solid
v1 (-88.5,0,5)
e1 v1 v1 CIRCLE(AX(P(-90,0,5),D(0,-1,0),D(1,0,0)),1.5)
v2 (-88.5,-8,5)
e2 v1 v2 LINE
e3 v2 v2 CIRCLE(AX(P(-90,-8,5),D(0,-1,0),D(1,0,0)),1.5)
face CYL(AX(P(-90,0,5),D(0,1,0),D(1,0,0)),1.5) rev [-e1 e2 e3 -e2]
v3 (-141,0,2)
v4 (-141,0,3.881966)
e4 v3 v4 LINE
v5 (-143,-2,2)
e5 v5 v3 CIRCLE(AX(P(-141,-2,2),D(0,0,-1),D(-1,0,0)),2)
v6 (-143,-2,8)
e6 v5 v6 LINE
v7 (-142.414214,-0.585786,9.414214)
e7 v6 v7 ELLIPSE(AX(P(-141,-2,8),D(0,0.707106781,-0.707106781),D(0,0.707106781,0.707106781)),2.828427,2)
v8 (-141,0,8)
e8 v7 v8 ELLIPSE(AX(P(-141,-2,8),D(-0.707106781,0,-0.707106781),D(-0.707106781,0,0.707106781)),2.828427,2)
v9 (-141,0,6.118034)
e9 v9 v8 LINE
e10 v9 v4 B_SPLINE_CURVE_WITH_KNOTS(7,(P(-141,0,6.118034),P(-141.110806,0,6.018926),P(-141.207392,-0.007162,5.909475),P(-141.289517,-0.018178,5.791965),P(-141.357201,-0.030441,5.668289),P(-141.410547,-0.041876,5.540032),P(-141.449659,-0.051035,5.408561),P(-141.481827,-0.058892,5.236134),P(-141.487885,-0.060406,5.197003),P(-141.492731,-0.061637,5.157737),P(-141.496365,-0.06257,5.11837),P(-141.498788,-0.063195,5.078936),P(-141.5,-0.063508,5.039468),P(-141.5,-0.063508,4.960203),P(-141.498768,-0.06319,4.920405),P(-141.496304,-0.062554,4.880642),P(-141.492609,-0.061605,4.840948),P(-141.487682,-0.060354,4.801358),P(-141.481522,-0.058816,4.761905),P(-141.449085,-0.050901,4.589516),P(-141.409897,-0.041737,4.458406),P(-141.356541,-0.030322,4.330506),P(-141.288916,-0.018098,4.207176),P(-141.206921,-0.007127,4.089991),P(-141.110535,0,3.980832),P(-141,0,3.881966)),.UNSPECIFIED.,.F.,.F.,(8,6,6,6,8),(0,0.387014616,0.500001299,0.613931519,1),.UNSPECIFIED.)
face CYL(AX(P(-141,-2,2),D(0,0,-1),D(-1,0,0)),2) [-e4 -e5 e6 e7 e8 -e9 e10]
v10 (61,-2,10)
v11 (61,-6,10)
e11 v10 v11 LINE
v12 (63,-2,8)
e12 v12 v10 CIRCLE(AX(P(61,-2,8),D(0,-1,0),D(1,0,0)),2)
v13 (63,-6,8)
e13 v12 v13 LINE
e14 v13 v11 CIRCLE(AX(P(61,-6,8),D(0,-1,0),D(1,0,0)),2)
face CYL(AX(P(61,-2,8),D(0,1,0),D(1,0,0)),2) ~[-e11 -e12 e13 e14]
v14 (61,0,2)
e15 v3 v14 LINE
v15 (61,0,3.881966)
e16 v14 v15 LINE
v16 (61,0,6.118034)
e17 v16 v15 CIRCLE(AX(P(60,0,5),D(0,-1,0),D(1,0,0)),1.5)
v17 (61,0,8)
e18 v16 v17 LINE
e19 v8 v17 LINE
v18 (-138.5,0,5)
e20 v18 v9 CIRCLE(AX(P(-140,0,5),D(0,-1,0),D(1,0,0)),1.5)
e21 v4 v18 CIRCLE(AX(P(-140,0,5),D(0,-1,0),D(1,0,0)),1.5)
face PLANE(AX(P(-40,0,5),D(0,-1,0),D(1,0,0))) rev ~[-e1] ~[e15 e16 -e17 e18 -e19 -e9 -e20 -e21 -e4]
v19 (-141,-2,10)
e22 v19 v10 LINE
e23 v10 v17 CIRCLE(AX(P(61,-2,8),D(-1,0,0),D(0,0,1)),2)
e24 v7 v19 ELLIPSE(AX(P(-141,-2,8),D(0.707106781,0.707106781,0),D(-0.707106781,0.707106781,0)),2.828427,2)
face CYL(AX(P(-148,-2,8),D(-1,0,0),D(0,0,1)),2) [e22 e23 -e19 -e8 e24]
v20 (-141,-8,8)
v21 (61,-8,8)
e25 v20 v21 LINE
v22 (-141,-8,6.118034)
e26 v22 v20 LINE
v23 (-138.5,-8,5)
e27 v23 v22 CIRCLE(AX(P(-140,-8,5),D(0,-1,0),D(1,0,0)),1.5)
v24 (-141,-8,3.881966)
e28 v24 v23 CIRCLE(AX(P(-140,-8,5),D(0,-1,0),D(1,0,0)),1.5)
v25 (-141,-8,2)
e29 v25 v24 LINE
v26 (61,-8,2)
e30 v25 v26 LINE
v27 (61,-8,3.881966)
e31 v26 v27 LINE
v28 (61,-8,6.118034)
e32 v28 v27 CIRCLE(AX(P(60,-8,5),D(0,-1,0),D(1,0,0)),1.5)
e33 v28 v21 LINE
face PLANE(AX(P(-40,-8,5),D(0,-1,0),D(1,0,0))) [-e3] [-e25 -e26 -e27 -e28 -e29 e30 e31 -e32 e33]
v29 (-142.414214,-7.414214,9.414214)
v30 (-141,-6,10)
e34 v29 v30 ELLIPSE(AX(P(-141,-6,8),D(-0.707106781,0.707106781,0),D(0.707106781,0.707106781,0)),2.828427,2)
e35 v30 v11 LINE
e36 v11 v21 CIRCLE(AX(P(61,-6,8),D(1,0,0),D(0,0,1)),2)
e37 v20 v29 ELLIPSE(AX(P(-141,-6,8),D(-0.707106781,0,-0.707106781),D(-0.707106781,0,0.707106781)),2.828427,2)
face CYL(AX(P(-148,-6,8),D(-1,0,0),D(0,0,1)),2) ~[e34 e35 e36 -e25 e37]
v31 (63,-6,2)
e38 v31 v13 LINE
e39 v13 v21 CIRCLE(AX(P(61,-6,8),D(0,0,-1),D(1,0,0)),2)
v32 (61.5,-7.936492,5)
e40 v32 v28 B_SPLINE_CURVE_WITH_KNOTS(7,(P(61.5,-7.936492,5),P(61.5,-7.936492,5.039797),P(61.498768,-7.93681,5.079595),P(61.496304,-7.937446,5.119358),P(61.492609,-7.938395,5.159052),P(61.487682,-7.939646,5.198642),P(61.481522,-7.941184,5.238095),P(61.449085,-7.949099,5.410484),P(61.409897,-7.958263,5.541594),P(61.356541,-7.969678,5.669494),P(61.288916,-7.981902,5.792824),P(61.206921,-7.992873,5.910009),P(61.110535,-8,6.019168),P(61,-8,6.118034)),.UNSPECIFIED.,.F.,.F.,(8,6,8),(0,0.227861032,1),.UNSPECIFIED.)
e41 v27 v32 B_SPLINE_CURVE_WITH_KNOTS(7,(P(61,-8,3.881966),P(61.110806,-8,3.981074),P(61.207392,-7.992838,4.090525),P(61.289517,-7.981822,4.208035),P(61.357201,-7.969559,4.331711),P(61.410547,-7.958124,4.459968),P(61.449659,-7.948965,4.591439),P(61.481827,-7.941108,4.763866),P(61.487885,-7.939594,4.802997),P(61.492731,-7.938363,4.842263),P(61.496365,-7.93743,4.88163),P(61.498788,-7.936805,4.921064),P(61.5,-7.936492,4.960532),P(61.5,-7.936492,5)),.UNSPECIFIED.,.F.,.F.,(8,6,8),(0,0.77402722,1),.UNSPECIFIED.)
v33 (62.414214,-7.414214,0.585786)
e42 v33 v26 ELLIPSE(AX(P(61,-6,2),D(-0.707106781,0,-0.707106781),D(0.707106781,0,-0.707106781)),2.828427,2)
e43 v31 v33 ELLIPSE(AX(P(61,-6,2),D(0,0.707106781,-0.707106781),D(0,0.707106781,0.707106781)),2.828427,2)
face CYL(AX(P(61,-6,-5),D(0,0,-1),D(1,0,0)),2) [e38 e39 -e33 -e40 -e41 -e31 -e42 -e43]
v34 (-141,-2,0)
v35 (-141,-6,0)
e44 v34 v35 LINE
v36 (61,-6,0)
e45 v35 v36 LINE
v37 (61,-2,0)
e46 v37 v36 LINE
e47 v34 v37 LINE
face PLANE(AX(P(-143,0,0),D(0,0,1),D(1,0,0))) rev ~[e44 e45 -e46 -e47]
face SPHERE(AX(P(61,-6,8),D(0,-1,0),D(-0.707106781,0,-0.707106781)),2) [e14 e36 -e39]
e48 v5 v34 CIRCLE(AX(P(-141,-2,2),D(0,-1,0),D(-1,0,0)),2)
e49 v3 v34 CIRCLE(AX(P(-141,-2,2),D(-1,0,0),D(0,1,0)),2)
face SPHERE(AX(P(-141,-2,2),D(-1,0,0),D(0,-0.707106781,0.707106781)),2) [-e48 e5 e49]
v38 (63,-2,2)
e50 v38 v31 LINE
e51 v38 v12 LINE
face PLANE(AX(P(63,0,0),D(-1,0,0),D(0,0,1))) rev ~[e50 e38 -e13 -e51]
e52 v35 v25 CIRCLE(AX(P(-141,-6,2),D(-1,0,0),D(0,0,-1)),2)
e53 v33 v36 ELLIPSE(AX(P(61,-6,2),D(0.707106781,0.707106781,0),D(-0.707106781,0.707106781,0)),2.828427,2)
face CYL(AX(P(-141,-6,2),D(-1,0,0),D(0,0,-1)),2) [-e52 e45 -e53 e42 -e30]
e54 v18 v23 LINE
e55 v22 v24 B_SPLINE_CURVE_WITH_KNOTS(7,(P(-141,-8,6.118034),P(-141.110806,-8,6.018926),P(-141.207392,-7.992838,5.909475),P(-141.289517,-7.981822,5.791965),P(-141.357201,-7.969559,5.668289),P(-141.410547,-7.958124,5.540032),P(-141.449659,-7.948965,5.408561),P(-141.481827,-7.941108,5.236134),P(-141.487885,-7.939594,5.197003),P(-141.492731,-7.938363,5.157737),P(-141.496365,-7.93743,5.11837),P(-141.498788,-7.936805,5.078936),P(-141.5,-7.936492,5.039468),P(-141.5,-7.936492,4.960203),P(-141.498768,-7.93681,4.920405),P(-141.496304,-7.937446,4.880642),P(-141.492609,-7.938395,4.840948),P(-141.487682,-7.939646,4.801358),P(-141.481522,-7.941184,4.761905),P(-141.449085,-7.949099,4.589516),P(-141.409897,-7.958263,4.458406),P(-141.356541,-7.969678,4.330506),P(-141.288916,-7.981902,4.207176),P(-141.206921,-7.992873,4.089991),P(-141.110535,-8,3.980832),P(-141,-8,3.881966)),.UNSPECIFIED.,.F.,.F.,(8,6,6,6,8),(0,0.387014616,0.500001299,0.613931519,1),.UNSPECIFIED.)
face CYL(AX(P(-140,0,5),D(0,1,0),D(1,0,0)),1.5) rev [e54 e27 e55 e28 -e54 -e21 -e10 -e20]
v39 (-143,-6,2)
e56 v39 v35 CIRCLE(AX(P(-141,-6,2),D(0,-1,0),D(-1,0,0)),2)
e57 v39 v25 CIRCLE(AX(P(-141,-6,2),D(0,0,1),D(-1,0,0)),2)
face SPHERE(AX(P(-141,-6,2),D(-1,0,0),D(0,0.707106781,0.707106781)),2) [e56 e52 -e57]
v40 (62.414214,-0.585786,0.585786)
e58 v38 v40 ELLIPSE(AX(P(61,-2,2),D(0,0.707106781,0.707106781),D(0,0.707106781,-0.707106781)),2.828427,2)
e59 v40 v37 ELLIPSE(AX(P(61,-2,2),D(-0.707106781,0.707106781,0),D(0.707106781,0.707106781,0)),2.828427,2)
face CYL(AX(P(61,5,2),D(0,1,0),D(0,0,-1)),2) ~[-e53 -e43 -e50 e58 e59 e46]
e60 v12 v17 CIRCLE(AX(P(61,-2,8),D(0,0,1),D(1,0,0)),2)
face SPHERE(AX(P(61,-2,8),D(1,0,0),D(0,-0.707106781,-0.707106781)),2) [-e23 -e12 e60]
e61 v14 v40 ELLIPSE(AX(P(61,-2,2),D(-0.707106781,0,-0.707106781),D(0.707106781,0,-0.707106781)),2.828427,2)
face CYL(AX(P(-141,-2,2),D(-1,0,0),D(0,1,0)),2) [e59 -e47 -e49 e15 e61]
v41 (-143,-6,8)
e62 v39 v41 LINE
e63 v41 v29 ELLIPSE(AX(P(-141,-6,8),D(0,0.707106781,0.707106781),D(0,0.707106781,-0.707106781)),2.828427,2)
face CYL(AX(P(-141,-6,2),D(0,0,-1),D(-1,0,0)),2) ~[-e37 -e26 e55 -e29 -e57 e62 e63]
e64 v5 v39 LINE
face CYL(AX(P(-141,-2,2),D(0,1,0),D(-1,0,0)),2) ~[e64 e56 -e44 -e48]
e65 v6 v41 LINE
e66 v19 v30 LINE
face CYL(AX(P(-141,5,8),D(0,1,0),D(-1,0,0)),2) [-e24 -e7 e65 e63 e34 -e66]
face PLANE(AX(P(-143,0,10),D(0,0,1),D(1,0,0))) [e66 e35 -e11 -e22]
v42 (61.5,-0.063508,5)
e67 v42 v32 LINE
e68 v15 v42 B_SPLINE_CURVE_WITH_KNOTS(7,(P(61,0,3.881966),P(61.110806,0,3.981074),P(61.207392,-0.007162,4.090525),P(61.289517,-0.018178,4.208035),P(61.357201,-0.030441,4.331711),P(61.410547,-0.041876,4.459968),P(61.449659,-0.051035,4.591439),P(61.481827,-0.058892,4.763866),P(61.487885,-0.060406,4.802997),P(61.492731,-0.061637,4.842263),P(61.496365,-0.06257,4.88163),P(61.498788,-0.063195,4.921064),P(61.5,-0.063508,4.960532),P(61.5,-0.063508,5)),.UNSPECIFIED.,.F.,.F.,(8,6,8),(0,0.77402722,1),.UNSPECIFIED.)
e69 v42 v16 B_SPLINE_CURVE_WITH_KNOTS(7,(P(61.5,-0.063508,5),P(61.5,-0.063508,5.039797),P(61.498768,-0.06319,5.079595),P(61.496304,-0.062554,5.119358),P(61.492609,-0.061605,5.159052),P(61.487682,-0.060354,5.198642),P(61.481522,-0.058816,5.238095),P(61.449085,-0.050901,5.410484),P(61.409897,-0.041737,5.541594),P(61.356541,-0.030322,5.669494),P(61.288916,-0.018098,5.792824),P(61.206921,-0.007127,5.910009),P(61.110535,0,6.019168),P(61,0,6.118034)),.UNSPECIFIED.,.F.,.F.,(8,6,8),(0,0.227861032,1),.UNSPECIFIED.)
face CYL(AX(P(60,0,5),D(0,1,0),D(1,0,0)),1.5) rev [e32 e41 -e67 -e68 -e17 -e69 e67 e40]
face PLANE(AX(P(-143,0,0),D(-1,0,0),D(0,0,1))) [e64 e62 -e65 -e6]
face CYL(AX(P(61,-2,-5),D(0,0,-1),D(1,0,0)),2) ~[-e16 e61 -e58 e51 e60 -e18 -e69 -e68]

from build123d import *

# Parameters (mm, degrees)
F0_W         = 206
F0_H         = 10
F0_R         = 1.5
F1_DEPTH     = 8
F2_T1_DEPTH  = 4
F2_T3_DEPTH  = 18
F2_T5_DEPTH  = 209
F2_T7_DEPTH  = 13
F2_S11_W     = 2
F2_S11_H     = 2
F2_T12_DEPTH = 2
F2_S17_W     = 2
F2_S17_H     = 2
F2_T18_DEPTH = 2
F3_T1_DEPTH  = 11
F3_T3_DEPTH  = 4
F3_T5_DEPTH  = 207
F3_S9_W      = 2.04
F3_S9_H      = 2.04
F3_T10_DEPTH = 2.04
F3_S15_W     = 2.04
F3_S15_H     = 2.04
F3_T16_DEPTH = 2.04


# Not quite as in the source:
# - a fillet or chamfer that OpenCascade refuses, or shapes differently, is made with other operations: its cross-section is extruded or revolved along the edge and cut away or added


with BuildPart() as f1:
    # F0 (on Front) → F1 (new body)
    with BuildSketch(Plane.XZ):
        with Locations((-40, 5)):
            Rectangle(F0_W, F0_H)
        with Locations((-140, 5)):
            Circle(F0_R, mode=Mode.SUBTRACT)
        with Locations((-90, 5)):
            Circle(F0_R, mode=Mode.SUBTRACT)
        with Locations((60, 5)):
            Circle(F0_R, mode=Mode.SUBTRACT)
    extrude(amount=F1_DEPTH)

    # F2: fillet of radius 2 on 7 edges, made by hand

    # F2_s2 → F2_t1 (cut)
    with BuildSketch(Plane.XZ.offset(2)):
        with BuildLine():
            ThreePointArc((63, 8), (62.4142135624, 9.4142135624), (61, 10))
            Line((61, 10), (63, 10))
            Line((63, 10), (63, 8))
        make_face()
    extrude(amount=F2_T1_DEPTH, mode=Mode.SUBTRACT)

    # F2_s4 → F2_t3 (cut)
    with BuildSketch(Plane.XZ.offset(-5)):
        with BuildLine():
            ThreePointArc((-143, 8), (-142.4142135624, 9.4142135624), (-141, 10))
            Line((-141, 10), (-143, 10))
            Line((-143, 10), (-143, 8))
        make_face()
        with BuildLine():
            ThreePointArc((61, 0), (62.4142135624, 0.5857864376), (63, 2))
            Line((63, 2), (63, 0))
            Line((63, 0), (61, 0))
        make_face()
    extrude(amount=F2_T3_DEPTH, mode=Mode.SUBTRACT)

    # F2_s6 → F2_t5 (cut)
    with BuildSketch(Plane.YZ.offset(-148)):
        with BuildLine():
            ThreePointArc((-2, 10), (-0.5857864376, 9.4142135624), (0, 8))
            Line((0, 8), (0, 10))
            Line((0, 10), (-2, 10))
        make_face()
        with BuildLine():
            ThreePointArc((-6, 10), (-7.4142135624, 9.4142135624), (-8, 8))
            Line((-8, 8), (-8, 10))
            Line((-8, 10), (-6, 10))
        make_face()
    extrude(amount=F2_T5_DEPTH, mode=Mode.SUBTRACT)

    # F2_s8 → F2_t7 (cut)
    with BuildSketch(Plane.XY.offset(-5)):
        with BuildLine():
            ThreePointArc((63, -2), (62.4142135624, -0.5857864376), (61, 0))
            Line((61, 0), (63, 0))
            Line((63, 0), (63, -2))
        make_face()
        with BuildLine():
            ThreePointArc((63, -6), (62.4142135624, -7.4142135624), (61, -8))
            Line((61, -8), (63, -8))
            Line((63, -8), (63, -6))
        make_face()
    extrude(amount=F2_T7_DEPTH, mode=Mode.SUBTRACT)


with BuildPart() as f2_tool10:
    # F2_s11 → F2_t12 (new body)
    with BuildSketch(Plane.YZ.offset(61)):
        with Locations((-1, 9)):
            Rectangle(F2_S11_W, F2_S11_H)
    extrude(amount=F2_T12_DEPTH)

    # F2_s13 → F2_t14 (revolve, cut)
    with BuildSketch(Plane(origin=(61, -2, 8), x_dir=(0, -0.7071067812, -0.7071067812), z_dir=(0, -0.7071067812, 0.7071067812))):
        with BuildLine():
            ThreePointArc((0, -2), (2, 0), (0, 2))
            Line((0, 2), (0, -2))
        make_face()
    revolve(axis=Axis((61, -2, 8), (1, 0, 0)), mode=Mode.SUBTRACT)


with BuildPart() as f1_1:
    add(f1.part)

    # F2_t9: cut F2_tool10
    add(f2_tool10.part, mode=Mode.SUBTRACT)


with BuildPart() as f2_tool16:
    # F2_s17 → F2_t18 (new body)
    with BuildSketch(Plane.XZ.offset(6)):
        with Locations((62, 9)):
            Rectangle(F2_S17_W, F2_S17_H)
    extrude(amount=F2_T18_DEPTH)

    # F2_s19 → F2_t20 (revolve, cut)
    with BuildSketch(Plane(origin=(61, -6, 8), x_dir=(-0.7071067812, 0, -0.7071067812), z_dir=(-0.7071067812, 0, 0.7071067812))):
        with BuildLine():
            ThreePointArc((0, -2), (2, 0), (0, 2))
            Line((0, 2), (0, -2))
        make_face()
    revolve(axis=Axis((61, -6, 8), (0, -1, 0)), mode=Mode.SUBTRACT)


with BuildPart() as f1_2:
    add(f1_1.part)

    # F2_t15: cut F2_tool16
    add(f2_tool16.part, mode=Mode.SUBTRACT)

    # F3: fillet of radius 2 on 7 edges, made by hand

    # F3_s2 → F3_t1 (cut)
    with BuildSketch(Plane.XY.offset(2)):
        with BuildLine():
            ThreePointArc((-143, -2), (-142.4142135624, -0.5857864376), (-141, 0))
            Line((-141, 0), (-143, 0))
            Line((-143, 0), (-143, -2))
        make_face()
        with BuildLine():
            ThreePointArc((-143, -6), (-142.4142135624, -7.4142135624), (-141, -8))
            Line((-141, -8), (-143, -8))
            Line((-143, -8), (-143, -6))
        make_face()
    extrude(amount=F3_T1_DEPTH, mode=Mode.SUBTRACT)

    # F3_s4 → F3_t3 (cut)
    with BuildSketch(Plane.XZ.offset(2)):
        with BuildLine():
            ThreePointArc((-143, 2), (-142.4142135624, 0.5857864376), (-141, 0))
            Line((-141, 0), (-143, 0))
            Line((-143, 0), (-143, 2))
        make_face()
    extrude(amount=F3_T3_DEPTH, mode=Mode.SUBTRACT)

    # F3_s6 → F3_t5 (cut)
    with BuildSketch(Plane.YZ.offset(-141)):
        with BuildLine():
            ThreePointArc((0, 2), (-0.5857864376, 0.5857864376), (-2, 0))
            Line((-2, 0), (0, 0))
            Line((0, 0), (0, 2))
        make_face()
        with BuildLine():
            ThreePointArc((-6, 0), (-7.4142135624, 0.5857864376), (-8, 2))
            Line((-8, 2), (-8, 0))
            Line((-8, 0), (-6, 0))
        make_face()
    extrude(amount=F3_T5_DEPTH, mode=Mode.SUBTRACT)


with BuildPart() as f3_tool8:
    # F3_s9 → F3_t10 (new body)
    with BuildSketch(Plane.YZ.offset(-141)):
        with Locations((-0.98, 0.98)):
            Rectangle(F3_S9_W, F3_S9_H)
    extrude(amount=-F3_T10_DEPTH)

    # F3_s11 → F3_t12 (revolve, cut)
    with BuildSketch(Plane(origin=(-141, -2, 2), x_dir=(0, -0.7071067812, 0.7071067812), z_dir=(0, -0.7071067812, -0.7071067812))):
        with BuildLine():
            ThreePointArc((0, -2), (2, 0), (0, 2))
            Line((0, 2), (0, -2))
        make_face()
    revolve(axis=Axis((-141, -2, 2), (-1, 0, 0)), mode=Mode.SUBTRACT)


with BuildPart() as f1_3:
    add(f1_2.part)

    # F3_t7: cut F3_tool8
    add(f3_tool8.part, mode=Mode.SUBTRACT)


with BuildPart() as f3_tool14:
    # F3_s15 → F3_t16 (new body)
    with BuildSketch(Plane.YZ.offset(-141)):
        with Locations((-7.02, 0.98)):
            Rectangle(F3_S15_W, F3_S15_H)
    extrude(amount=-F3_T16_DEPTH)

    # F3_s17 → F3_t18 (revolve, cut)
    with BuildSketch(Plane(origin=(-141, -6, 2), x_dir=(0, 0.7071067812, 0.7071067812), z_dir=(0, -0.7071067812, 0.7071067812))):
        with BuildLine():
            ThreePointArc((0, -2), (2, 0), (0, 2))
            Line((0, 2), (0, -2))
        make_face()
    revolve(axis=Axis((-141, -6, 2), (-1, 0, 0)), mode=Mode.SUBTRACT)


with BuildPart() as f1_4:
    add(f1_3.part)

    # F3_t13: cut F3_tool14
    add(f3_tool14.part, mode=Mode.SUBTRACT)


solid = f1_4.part
